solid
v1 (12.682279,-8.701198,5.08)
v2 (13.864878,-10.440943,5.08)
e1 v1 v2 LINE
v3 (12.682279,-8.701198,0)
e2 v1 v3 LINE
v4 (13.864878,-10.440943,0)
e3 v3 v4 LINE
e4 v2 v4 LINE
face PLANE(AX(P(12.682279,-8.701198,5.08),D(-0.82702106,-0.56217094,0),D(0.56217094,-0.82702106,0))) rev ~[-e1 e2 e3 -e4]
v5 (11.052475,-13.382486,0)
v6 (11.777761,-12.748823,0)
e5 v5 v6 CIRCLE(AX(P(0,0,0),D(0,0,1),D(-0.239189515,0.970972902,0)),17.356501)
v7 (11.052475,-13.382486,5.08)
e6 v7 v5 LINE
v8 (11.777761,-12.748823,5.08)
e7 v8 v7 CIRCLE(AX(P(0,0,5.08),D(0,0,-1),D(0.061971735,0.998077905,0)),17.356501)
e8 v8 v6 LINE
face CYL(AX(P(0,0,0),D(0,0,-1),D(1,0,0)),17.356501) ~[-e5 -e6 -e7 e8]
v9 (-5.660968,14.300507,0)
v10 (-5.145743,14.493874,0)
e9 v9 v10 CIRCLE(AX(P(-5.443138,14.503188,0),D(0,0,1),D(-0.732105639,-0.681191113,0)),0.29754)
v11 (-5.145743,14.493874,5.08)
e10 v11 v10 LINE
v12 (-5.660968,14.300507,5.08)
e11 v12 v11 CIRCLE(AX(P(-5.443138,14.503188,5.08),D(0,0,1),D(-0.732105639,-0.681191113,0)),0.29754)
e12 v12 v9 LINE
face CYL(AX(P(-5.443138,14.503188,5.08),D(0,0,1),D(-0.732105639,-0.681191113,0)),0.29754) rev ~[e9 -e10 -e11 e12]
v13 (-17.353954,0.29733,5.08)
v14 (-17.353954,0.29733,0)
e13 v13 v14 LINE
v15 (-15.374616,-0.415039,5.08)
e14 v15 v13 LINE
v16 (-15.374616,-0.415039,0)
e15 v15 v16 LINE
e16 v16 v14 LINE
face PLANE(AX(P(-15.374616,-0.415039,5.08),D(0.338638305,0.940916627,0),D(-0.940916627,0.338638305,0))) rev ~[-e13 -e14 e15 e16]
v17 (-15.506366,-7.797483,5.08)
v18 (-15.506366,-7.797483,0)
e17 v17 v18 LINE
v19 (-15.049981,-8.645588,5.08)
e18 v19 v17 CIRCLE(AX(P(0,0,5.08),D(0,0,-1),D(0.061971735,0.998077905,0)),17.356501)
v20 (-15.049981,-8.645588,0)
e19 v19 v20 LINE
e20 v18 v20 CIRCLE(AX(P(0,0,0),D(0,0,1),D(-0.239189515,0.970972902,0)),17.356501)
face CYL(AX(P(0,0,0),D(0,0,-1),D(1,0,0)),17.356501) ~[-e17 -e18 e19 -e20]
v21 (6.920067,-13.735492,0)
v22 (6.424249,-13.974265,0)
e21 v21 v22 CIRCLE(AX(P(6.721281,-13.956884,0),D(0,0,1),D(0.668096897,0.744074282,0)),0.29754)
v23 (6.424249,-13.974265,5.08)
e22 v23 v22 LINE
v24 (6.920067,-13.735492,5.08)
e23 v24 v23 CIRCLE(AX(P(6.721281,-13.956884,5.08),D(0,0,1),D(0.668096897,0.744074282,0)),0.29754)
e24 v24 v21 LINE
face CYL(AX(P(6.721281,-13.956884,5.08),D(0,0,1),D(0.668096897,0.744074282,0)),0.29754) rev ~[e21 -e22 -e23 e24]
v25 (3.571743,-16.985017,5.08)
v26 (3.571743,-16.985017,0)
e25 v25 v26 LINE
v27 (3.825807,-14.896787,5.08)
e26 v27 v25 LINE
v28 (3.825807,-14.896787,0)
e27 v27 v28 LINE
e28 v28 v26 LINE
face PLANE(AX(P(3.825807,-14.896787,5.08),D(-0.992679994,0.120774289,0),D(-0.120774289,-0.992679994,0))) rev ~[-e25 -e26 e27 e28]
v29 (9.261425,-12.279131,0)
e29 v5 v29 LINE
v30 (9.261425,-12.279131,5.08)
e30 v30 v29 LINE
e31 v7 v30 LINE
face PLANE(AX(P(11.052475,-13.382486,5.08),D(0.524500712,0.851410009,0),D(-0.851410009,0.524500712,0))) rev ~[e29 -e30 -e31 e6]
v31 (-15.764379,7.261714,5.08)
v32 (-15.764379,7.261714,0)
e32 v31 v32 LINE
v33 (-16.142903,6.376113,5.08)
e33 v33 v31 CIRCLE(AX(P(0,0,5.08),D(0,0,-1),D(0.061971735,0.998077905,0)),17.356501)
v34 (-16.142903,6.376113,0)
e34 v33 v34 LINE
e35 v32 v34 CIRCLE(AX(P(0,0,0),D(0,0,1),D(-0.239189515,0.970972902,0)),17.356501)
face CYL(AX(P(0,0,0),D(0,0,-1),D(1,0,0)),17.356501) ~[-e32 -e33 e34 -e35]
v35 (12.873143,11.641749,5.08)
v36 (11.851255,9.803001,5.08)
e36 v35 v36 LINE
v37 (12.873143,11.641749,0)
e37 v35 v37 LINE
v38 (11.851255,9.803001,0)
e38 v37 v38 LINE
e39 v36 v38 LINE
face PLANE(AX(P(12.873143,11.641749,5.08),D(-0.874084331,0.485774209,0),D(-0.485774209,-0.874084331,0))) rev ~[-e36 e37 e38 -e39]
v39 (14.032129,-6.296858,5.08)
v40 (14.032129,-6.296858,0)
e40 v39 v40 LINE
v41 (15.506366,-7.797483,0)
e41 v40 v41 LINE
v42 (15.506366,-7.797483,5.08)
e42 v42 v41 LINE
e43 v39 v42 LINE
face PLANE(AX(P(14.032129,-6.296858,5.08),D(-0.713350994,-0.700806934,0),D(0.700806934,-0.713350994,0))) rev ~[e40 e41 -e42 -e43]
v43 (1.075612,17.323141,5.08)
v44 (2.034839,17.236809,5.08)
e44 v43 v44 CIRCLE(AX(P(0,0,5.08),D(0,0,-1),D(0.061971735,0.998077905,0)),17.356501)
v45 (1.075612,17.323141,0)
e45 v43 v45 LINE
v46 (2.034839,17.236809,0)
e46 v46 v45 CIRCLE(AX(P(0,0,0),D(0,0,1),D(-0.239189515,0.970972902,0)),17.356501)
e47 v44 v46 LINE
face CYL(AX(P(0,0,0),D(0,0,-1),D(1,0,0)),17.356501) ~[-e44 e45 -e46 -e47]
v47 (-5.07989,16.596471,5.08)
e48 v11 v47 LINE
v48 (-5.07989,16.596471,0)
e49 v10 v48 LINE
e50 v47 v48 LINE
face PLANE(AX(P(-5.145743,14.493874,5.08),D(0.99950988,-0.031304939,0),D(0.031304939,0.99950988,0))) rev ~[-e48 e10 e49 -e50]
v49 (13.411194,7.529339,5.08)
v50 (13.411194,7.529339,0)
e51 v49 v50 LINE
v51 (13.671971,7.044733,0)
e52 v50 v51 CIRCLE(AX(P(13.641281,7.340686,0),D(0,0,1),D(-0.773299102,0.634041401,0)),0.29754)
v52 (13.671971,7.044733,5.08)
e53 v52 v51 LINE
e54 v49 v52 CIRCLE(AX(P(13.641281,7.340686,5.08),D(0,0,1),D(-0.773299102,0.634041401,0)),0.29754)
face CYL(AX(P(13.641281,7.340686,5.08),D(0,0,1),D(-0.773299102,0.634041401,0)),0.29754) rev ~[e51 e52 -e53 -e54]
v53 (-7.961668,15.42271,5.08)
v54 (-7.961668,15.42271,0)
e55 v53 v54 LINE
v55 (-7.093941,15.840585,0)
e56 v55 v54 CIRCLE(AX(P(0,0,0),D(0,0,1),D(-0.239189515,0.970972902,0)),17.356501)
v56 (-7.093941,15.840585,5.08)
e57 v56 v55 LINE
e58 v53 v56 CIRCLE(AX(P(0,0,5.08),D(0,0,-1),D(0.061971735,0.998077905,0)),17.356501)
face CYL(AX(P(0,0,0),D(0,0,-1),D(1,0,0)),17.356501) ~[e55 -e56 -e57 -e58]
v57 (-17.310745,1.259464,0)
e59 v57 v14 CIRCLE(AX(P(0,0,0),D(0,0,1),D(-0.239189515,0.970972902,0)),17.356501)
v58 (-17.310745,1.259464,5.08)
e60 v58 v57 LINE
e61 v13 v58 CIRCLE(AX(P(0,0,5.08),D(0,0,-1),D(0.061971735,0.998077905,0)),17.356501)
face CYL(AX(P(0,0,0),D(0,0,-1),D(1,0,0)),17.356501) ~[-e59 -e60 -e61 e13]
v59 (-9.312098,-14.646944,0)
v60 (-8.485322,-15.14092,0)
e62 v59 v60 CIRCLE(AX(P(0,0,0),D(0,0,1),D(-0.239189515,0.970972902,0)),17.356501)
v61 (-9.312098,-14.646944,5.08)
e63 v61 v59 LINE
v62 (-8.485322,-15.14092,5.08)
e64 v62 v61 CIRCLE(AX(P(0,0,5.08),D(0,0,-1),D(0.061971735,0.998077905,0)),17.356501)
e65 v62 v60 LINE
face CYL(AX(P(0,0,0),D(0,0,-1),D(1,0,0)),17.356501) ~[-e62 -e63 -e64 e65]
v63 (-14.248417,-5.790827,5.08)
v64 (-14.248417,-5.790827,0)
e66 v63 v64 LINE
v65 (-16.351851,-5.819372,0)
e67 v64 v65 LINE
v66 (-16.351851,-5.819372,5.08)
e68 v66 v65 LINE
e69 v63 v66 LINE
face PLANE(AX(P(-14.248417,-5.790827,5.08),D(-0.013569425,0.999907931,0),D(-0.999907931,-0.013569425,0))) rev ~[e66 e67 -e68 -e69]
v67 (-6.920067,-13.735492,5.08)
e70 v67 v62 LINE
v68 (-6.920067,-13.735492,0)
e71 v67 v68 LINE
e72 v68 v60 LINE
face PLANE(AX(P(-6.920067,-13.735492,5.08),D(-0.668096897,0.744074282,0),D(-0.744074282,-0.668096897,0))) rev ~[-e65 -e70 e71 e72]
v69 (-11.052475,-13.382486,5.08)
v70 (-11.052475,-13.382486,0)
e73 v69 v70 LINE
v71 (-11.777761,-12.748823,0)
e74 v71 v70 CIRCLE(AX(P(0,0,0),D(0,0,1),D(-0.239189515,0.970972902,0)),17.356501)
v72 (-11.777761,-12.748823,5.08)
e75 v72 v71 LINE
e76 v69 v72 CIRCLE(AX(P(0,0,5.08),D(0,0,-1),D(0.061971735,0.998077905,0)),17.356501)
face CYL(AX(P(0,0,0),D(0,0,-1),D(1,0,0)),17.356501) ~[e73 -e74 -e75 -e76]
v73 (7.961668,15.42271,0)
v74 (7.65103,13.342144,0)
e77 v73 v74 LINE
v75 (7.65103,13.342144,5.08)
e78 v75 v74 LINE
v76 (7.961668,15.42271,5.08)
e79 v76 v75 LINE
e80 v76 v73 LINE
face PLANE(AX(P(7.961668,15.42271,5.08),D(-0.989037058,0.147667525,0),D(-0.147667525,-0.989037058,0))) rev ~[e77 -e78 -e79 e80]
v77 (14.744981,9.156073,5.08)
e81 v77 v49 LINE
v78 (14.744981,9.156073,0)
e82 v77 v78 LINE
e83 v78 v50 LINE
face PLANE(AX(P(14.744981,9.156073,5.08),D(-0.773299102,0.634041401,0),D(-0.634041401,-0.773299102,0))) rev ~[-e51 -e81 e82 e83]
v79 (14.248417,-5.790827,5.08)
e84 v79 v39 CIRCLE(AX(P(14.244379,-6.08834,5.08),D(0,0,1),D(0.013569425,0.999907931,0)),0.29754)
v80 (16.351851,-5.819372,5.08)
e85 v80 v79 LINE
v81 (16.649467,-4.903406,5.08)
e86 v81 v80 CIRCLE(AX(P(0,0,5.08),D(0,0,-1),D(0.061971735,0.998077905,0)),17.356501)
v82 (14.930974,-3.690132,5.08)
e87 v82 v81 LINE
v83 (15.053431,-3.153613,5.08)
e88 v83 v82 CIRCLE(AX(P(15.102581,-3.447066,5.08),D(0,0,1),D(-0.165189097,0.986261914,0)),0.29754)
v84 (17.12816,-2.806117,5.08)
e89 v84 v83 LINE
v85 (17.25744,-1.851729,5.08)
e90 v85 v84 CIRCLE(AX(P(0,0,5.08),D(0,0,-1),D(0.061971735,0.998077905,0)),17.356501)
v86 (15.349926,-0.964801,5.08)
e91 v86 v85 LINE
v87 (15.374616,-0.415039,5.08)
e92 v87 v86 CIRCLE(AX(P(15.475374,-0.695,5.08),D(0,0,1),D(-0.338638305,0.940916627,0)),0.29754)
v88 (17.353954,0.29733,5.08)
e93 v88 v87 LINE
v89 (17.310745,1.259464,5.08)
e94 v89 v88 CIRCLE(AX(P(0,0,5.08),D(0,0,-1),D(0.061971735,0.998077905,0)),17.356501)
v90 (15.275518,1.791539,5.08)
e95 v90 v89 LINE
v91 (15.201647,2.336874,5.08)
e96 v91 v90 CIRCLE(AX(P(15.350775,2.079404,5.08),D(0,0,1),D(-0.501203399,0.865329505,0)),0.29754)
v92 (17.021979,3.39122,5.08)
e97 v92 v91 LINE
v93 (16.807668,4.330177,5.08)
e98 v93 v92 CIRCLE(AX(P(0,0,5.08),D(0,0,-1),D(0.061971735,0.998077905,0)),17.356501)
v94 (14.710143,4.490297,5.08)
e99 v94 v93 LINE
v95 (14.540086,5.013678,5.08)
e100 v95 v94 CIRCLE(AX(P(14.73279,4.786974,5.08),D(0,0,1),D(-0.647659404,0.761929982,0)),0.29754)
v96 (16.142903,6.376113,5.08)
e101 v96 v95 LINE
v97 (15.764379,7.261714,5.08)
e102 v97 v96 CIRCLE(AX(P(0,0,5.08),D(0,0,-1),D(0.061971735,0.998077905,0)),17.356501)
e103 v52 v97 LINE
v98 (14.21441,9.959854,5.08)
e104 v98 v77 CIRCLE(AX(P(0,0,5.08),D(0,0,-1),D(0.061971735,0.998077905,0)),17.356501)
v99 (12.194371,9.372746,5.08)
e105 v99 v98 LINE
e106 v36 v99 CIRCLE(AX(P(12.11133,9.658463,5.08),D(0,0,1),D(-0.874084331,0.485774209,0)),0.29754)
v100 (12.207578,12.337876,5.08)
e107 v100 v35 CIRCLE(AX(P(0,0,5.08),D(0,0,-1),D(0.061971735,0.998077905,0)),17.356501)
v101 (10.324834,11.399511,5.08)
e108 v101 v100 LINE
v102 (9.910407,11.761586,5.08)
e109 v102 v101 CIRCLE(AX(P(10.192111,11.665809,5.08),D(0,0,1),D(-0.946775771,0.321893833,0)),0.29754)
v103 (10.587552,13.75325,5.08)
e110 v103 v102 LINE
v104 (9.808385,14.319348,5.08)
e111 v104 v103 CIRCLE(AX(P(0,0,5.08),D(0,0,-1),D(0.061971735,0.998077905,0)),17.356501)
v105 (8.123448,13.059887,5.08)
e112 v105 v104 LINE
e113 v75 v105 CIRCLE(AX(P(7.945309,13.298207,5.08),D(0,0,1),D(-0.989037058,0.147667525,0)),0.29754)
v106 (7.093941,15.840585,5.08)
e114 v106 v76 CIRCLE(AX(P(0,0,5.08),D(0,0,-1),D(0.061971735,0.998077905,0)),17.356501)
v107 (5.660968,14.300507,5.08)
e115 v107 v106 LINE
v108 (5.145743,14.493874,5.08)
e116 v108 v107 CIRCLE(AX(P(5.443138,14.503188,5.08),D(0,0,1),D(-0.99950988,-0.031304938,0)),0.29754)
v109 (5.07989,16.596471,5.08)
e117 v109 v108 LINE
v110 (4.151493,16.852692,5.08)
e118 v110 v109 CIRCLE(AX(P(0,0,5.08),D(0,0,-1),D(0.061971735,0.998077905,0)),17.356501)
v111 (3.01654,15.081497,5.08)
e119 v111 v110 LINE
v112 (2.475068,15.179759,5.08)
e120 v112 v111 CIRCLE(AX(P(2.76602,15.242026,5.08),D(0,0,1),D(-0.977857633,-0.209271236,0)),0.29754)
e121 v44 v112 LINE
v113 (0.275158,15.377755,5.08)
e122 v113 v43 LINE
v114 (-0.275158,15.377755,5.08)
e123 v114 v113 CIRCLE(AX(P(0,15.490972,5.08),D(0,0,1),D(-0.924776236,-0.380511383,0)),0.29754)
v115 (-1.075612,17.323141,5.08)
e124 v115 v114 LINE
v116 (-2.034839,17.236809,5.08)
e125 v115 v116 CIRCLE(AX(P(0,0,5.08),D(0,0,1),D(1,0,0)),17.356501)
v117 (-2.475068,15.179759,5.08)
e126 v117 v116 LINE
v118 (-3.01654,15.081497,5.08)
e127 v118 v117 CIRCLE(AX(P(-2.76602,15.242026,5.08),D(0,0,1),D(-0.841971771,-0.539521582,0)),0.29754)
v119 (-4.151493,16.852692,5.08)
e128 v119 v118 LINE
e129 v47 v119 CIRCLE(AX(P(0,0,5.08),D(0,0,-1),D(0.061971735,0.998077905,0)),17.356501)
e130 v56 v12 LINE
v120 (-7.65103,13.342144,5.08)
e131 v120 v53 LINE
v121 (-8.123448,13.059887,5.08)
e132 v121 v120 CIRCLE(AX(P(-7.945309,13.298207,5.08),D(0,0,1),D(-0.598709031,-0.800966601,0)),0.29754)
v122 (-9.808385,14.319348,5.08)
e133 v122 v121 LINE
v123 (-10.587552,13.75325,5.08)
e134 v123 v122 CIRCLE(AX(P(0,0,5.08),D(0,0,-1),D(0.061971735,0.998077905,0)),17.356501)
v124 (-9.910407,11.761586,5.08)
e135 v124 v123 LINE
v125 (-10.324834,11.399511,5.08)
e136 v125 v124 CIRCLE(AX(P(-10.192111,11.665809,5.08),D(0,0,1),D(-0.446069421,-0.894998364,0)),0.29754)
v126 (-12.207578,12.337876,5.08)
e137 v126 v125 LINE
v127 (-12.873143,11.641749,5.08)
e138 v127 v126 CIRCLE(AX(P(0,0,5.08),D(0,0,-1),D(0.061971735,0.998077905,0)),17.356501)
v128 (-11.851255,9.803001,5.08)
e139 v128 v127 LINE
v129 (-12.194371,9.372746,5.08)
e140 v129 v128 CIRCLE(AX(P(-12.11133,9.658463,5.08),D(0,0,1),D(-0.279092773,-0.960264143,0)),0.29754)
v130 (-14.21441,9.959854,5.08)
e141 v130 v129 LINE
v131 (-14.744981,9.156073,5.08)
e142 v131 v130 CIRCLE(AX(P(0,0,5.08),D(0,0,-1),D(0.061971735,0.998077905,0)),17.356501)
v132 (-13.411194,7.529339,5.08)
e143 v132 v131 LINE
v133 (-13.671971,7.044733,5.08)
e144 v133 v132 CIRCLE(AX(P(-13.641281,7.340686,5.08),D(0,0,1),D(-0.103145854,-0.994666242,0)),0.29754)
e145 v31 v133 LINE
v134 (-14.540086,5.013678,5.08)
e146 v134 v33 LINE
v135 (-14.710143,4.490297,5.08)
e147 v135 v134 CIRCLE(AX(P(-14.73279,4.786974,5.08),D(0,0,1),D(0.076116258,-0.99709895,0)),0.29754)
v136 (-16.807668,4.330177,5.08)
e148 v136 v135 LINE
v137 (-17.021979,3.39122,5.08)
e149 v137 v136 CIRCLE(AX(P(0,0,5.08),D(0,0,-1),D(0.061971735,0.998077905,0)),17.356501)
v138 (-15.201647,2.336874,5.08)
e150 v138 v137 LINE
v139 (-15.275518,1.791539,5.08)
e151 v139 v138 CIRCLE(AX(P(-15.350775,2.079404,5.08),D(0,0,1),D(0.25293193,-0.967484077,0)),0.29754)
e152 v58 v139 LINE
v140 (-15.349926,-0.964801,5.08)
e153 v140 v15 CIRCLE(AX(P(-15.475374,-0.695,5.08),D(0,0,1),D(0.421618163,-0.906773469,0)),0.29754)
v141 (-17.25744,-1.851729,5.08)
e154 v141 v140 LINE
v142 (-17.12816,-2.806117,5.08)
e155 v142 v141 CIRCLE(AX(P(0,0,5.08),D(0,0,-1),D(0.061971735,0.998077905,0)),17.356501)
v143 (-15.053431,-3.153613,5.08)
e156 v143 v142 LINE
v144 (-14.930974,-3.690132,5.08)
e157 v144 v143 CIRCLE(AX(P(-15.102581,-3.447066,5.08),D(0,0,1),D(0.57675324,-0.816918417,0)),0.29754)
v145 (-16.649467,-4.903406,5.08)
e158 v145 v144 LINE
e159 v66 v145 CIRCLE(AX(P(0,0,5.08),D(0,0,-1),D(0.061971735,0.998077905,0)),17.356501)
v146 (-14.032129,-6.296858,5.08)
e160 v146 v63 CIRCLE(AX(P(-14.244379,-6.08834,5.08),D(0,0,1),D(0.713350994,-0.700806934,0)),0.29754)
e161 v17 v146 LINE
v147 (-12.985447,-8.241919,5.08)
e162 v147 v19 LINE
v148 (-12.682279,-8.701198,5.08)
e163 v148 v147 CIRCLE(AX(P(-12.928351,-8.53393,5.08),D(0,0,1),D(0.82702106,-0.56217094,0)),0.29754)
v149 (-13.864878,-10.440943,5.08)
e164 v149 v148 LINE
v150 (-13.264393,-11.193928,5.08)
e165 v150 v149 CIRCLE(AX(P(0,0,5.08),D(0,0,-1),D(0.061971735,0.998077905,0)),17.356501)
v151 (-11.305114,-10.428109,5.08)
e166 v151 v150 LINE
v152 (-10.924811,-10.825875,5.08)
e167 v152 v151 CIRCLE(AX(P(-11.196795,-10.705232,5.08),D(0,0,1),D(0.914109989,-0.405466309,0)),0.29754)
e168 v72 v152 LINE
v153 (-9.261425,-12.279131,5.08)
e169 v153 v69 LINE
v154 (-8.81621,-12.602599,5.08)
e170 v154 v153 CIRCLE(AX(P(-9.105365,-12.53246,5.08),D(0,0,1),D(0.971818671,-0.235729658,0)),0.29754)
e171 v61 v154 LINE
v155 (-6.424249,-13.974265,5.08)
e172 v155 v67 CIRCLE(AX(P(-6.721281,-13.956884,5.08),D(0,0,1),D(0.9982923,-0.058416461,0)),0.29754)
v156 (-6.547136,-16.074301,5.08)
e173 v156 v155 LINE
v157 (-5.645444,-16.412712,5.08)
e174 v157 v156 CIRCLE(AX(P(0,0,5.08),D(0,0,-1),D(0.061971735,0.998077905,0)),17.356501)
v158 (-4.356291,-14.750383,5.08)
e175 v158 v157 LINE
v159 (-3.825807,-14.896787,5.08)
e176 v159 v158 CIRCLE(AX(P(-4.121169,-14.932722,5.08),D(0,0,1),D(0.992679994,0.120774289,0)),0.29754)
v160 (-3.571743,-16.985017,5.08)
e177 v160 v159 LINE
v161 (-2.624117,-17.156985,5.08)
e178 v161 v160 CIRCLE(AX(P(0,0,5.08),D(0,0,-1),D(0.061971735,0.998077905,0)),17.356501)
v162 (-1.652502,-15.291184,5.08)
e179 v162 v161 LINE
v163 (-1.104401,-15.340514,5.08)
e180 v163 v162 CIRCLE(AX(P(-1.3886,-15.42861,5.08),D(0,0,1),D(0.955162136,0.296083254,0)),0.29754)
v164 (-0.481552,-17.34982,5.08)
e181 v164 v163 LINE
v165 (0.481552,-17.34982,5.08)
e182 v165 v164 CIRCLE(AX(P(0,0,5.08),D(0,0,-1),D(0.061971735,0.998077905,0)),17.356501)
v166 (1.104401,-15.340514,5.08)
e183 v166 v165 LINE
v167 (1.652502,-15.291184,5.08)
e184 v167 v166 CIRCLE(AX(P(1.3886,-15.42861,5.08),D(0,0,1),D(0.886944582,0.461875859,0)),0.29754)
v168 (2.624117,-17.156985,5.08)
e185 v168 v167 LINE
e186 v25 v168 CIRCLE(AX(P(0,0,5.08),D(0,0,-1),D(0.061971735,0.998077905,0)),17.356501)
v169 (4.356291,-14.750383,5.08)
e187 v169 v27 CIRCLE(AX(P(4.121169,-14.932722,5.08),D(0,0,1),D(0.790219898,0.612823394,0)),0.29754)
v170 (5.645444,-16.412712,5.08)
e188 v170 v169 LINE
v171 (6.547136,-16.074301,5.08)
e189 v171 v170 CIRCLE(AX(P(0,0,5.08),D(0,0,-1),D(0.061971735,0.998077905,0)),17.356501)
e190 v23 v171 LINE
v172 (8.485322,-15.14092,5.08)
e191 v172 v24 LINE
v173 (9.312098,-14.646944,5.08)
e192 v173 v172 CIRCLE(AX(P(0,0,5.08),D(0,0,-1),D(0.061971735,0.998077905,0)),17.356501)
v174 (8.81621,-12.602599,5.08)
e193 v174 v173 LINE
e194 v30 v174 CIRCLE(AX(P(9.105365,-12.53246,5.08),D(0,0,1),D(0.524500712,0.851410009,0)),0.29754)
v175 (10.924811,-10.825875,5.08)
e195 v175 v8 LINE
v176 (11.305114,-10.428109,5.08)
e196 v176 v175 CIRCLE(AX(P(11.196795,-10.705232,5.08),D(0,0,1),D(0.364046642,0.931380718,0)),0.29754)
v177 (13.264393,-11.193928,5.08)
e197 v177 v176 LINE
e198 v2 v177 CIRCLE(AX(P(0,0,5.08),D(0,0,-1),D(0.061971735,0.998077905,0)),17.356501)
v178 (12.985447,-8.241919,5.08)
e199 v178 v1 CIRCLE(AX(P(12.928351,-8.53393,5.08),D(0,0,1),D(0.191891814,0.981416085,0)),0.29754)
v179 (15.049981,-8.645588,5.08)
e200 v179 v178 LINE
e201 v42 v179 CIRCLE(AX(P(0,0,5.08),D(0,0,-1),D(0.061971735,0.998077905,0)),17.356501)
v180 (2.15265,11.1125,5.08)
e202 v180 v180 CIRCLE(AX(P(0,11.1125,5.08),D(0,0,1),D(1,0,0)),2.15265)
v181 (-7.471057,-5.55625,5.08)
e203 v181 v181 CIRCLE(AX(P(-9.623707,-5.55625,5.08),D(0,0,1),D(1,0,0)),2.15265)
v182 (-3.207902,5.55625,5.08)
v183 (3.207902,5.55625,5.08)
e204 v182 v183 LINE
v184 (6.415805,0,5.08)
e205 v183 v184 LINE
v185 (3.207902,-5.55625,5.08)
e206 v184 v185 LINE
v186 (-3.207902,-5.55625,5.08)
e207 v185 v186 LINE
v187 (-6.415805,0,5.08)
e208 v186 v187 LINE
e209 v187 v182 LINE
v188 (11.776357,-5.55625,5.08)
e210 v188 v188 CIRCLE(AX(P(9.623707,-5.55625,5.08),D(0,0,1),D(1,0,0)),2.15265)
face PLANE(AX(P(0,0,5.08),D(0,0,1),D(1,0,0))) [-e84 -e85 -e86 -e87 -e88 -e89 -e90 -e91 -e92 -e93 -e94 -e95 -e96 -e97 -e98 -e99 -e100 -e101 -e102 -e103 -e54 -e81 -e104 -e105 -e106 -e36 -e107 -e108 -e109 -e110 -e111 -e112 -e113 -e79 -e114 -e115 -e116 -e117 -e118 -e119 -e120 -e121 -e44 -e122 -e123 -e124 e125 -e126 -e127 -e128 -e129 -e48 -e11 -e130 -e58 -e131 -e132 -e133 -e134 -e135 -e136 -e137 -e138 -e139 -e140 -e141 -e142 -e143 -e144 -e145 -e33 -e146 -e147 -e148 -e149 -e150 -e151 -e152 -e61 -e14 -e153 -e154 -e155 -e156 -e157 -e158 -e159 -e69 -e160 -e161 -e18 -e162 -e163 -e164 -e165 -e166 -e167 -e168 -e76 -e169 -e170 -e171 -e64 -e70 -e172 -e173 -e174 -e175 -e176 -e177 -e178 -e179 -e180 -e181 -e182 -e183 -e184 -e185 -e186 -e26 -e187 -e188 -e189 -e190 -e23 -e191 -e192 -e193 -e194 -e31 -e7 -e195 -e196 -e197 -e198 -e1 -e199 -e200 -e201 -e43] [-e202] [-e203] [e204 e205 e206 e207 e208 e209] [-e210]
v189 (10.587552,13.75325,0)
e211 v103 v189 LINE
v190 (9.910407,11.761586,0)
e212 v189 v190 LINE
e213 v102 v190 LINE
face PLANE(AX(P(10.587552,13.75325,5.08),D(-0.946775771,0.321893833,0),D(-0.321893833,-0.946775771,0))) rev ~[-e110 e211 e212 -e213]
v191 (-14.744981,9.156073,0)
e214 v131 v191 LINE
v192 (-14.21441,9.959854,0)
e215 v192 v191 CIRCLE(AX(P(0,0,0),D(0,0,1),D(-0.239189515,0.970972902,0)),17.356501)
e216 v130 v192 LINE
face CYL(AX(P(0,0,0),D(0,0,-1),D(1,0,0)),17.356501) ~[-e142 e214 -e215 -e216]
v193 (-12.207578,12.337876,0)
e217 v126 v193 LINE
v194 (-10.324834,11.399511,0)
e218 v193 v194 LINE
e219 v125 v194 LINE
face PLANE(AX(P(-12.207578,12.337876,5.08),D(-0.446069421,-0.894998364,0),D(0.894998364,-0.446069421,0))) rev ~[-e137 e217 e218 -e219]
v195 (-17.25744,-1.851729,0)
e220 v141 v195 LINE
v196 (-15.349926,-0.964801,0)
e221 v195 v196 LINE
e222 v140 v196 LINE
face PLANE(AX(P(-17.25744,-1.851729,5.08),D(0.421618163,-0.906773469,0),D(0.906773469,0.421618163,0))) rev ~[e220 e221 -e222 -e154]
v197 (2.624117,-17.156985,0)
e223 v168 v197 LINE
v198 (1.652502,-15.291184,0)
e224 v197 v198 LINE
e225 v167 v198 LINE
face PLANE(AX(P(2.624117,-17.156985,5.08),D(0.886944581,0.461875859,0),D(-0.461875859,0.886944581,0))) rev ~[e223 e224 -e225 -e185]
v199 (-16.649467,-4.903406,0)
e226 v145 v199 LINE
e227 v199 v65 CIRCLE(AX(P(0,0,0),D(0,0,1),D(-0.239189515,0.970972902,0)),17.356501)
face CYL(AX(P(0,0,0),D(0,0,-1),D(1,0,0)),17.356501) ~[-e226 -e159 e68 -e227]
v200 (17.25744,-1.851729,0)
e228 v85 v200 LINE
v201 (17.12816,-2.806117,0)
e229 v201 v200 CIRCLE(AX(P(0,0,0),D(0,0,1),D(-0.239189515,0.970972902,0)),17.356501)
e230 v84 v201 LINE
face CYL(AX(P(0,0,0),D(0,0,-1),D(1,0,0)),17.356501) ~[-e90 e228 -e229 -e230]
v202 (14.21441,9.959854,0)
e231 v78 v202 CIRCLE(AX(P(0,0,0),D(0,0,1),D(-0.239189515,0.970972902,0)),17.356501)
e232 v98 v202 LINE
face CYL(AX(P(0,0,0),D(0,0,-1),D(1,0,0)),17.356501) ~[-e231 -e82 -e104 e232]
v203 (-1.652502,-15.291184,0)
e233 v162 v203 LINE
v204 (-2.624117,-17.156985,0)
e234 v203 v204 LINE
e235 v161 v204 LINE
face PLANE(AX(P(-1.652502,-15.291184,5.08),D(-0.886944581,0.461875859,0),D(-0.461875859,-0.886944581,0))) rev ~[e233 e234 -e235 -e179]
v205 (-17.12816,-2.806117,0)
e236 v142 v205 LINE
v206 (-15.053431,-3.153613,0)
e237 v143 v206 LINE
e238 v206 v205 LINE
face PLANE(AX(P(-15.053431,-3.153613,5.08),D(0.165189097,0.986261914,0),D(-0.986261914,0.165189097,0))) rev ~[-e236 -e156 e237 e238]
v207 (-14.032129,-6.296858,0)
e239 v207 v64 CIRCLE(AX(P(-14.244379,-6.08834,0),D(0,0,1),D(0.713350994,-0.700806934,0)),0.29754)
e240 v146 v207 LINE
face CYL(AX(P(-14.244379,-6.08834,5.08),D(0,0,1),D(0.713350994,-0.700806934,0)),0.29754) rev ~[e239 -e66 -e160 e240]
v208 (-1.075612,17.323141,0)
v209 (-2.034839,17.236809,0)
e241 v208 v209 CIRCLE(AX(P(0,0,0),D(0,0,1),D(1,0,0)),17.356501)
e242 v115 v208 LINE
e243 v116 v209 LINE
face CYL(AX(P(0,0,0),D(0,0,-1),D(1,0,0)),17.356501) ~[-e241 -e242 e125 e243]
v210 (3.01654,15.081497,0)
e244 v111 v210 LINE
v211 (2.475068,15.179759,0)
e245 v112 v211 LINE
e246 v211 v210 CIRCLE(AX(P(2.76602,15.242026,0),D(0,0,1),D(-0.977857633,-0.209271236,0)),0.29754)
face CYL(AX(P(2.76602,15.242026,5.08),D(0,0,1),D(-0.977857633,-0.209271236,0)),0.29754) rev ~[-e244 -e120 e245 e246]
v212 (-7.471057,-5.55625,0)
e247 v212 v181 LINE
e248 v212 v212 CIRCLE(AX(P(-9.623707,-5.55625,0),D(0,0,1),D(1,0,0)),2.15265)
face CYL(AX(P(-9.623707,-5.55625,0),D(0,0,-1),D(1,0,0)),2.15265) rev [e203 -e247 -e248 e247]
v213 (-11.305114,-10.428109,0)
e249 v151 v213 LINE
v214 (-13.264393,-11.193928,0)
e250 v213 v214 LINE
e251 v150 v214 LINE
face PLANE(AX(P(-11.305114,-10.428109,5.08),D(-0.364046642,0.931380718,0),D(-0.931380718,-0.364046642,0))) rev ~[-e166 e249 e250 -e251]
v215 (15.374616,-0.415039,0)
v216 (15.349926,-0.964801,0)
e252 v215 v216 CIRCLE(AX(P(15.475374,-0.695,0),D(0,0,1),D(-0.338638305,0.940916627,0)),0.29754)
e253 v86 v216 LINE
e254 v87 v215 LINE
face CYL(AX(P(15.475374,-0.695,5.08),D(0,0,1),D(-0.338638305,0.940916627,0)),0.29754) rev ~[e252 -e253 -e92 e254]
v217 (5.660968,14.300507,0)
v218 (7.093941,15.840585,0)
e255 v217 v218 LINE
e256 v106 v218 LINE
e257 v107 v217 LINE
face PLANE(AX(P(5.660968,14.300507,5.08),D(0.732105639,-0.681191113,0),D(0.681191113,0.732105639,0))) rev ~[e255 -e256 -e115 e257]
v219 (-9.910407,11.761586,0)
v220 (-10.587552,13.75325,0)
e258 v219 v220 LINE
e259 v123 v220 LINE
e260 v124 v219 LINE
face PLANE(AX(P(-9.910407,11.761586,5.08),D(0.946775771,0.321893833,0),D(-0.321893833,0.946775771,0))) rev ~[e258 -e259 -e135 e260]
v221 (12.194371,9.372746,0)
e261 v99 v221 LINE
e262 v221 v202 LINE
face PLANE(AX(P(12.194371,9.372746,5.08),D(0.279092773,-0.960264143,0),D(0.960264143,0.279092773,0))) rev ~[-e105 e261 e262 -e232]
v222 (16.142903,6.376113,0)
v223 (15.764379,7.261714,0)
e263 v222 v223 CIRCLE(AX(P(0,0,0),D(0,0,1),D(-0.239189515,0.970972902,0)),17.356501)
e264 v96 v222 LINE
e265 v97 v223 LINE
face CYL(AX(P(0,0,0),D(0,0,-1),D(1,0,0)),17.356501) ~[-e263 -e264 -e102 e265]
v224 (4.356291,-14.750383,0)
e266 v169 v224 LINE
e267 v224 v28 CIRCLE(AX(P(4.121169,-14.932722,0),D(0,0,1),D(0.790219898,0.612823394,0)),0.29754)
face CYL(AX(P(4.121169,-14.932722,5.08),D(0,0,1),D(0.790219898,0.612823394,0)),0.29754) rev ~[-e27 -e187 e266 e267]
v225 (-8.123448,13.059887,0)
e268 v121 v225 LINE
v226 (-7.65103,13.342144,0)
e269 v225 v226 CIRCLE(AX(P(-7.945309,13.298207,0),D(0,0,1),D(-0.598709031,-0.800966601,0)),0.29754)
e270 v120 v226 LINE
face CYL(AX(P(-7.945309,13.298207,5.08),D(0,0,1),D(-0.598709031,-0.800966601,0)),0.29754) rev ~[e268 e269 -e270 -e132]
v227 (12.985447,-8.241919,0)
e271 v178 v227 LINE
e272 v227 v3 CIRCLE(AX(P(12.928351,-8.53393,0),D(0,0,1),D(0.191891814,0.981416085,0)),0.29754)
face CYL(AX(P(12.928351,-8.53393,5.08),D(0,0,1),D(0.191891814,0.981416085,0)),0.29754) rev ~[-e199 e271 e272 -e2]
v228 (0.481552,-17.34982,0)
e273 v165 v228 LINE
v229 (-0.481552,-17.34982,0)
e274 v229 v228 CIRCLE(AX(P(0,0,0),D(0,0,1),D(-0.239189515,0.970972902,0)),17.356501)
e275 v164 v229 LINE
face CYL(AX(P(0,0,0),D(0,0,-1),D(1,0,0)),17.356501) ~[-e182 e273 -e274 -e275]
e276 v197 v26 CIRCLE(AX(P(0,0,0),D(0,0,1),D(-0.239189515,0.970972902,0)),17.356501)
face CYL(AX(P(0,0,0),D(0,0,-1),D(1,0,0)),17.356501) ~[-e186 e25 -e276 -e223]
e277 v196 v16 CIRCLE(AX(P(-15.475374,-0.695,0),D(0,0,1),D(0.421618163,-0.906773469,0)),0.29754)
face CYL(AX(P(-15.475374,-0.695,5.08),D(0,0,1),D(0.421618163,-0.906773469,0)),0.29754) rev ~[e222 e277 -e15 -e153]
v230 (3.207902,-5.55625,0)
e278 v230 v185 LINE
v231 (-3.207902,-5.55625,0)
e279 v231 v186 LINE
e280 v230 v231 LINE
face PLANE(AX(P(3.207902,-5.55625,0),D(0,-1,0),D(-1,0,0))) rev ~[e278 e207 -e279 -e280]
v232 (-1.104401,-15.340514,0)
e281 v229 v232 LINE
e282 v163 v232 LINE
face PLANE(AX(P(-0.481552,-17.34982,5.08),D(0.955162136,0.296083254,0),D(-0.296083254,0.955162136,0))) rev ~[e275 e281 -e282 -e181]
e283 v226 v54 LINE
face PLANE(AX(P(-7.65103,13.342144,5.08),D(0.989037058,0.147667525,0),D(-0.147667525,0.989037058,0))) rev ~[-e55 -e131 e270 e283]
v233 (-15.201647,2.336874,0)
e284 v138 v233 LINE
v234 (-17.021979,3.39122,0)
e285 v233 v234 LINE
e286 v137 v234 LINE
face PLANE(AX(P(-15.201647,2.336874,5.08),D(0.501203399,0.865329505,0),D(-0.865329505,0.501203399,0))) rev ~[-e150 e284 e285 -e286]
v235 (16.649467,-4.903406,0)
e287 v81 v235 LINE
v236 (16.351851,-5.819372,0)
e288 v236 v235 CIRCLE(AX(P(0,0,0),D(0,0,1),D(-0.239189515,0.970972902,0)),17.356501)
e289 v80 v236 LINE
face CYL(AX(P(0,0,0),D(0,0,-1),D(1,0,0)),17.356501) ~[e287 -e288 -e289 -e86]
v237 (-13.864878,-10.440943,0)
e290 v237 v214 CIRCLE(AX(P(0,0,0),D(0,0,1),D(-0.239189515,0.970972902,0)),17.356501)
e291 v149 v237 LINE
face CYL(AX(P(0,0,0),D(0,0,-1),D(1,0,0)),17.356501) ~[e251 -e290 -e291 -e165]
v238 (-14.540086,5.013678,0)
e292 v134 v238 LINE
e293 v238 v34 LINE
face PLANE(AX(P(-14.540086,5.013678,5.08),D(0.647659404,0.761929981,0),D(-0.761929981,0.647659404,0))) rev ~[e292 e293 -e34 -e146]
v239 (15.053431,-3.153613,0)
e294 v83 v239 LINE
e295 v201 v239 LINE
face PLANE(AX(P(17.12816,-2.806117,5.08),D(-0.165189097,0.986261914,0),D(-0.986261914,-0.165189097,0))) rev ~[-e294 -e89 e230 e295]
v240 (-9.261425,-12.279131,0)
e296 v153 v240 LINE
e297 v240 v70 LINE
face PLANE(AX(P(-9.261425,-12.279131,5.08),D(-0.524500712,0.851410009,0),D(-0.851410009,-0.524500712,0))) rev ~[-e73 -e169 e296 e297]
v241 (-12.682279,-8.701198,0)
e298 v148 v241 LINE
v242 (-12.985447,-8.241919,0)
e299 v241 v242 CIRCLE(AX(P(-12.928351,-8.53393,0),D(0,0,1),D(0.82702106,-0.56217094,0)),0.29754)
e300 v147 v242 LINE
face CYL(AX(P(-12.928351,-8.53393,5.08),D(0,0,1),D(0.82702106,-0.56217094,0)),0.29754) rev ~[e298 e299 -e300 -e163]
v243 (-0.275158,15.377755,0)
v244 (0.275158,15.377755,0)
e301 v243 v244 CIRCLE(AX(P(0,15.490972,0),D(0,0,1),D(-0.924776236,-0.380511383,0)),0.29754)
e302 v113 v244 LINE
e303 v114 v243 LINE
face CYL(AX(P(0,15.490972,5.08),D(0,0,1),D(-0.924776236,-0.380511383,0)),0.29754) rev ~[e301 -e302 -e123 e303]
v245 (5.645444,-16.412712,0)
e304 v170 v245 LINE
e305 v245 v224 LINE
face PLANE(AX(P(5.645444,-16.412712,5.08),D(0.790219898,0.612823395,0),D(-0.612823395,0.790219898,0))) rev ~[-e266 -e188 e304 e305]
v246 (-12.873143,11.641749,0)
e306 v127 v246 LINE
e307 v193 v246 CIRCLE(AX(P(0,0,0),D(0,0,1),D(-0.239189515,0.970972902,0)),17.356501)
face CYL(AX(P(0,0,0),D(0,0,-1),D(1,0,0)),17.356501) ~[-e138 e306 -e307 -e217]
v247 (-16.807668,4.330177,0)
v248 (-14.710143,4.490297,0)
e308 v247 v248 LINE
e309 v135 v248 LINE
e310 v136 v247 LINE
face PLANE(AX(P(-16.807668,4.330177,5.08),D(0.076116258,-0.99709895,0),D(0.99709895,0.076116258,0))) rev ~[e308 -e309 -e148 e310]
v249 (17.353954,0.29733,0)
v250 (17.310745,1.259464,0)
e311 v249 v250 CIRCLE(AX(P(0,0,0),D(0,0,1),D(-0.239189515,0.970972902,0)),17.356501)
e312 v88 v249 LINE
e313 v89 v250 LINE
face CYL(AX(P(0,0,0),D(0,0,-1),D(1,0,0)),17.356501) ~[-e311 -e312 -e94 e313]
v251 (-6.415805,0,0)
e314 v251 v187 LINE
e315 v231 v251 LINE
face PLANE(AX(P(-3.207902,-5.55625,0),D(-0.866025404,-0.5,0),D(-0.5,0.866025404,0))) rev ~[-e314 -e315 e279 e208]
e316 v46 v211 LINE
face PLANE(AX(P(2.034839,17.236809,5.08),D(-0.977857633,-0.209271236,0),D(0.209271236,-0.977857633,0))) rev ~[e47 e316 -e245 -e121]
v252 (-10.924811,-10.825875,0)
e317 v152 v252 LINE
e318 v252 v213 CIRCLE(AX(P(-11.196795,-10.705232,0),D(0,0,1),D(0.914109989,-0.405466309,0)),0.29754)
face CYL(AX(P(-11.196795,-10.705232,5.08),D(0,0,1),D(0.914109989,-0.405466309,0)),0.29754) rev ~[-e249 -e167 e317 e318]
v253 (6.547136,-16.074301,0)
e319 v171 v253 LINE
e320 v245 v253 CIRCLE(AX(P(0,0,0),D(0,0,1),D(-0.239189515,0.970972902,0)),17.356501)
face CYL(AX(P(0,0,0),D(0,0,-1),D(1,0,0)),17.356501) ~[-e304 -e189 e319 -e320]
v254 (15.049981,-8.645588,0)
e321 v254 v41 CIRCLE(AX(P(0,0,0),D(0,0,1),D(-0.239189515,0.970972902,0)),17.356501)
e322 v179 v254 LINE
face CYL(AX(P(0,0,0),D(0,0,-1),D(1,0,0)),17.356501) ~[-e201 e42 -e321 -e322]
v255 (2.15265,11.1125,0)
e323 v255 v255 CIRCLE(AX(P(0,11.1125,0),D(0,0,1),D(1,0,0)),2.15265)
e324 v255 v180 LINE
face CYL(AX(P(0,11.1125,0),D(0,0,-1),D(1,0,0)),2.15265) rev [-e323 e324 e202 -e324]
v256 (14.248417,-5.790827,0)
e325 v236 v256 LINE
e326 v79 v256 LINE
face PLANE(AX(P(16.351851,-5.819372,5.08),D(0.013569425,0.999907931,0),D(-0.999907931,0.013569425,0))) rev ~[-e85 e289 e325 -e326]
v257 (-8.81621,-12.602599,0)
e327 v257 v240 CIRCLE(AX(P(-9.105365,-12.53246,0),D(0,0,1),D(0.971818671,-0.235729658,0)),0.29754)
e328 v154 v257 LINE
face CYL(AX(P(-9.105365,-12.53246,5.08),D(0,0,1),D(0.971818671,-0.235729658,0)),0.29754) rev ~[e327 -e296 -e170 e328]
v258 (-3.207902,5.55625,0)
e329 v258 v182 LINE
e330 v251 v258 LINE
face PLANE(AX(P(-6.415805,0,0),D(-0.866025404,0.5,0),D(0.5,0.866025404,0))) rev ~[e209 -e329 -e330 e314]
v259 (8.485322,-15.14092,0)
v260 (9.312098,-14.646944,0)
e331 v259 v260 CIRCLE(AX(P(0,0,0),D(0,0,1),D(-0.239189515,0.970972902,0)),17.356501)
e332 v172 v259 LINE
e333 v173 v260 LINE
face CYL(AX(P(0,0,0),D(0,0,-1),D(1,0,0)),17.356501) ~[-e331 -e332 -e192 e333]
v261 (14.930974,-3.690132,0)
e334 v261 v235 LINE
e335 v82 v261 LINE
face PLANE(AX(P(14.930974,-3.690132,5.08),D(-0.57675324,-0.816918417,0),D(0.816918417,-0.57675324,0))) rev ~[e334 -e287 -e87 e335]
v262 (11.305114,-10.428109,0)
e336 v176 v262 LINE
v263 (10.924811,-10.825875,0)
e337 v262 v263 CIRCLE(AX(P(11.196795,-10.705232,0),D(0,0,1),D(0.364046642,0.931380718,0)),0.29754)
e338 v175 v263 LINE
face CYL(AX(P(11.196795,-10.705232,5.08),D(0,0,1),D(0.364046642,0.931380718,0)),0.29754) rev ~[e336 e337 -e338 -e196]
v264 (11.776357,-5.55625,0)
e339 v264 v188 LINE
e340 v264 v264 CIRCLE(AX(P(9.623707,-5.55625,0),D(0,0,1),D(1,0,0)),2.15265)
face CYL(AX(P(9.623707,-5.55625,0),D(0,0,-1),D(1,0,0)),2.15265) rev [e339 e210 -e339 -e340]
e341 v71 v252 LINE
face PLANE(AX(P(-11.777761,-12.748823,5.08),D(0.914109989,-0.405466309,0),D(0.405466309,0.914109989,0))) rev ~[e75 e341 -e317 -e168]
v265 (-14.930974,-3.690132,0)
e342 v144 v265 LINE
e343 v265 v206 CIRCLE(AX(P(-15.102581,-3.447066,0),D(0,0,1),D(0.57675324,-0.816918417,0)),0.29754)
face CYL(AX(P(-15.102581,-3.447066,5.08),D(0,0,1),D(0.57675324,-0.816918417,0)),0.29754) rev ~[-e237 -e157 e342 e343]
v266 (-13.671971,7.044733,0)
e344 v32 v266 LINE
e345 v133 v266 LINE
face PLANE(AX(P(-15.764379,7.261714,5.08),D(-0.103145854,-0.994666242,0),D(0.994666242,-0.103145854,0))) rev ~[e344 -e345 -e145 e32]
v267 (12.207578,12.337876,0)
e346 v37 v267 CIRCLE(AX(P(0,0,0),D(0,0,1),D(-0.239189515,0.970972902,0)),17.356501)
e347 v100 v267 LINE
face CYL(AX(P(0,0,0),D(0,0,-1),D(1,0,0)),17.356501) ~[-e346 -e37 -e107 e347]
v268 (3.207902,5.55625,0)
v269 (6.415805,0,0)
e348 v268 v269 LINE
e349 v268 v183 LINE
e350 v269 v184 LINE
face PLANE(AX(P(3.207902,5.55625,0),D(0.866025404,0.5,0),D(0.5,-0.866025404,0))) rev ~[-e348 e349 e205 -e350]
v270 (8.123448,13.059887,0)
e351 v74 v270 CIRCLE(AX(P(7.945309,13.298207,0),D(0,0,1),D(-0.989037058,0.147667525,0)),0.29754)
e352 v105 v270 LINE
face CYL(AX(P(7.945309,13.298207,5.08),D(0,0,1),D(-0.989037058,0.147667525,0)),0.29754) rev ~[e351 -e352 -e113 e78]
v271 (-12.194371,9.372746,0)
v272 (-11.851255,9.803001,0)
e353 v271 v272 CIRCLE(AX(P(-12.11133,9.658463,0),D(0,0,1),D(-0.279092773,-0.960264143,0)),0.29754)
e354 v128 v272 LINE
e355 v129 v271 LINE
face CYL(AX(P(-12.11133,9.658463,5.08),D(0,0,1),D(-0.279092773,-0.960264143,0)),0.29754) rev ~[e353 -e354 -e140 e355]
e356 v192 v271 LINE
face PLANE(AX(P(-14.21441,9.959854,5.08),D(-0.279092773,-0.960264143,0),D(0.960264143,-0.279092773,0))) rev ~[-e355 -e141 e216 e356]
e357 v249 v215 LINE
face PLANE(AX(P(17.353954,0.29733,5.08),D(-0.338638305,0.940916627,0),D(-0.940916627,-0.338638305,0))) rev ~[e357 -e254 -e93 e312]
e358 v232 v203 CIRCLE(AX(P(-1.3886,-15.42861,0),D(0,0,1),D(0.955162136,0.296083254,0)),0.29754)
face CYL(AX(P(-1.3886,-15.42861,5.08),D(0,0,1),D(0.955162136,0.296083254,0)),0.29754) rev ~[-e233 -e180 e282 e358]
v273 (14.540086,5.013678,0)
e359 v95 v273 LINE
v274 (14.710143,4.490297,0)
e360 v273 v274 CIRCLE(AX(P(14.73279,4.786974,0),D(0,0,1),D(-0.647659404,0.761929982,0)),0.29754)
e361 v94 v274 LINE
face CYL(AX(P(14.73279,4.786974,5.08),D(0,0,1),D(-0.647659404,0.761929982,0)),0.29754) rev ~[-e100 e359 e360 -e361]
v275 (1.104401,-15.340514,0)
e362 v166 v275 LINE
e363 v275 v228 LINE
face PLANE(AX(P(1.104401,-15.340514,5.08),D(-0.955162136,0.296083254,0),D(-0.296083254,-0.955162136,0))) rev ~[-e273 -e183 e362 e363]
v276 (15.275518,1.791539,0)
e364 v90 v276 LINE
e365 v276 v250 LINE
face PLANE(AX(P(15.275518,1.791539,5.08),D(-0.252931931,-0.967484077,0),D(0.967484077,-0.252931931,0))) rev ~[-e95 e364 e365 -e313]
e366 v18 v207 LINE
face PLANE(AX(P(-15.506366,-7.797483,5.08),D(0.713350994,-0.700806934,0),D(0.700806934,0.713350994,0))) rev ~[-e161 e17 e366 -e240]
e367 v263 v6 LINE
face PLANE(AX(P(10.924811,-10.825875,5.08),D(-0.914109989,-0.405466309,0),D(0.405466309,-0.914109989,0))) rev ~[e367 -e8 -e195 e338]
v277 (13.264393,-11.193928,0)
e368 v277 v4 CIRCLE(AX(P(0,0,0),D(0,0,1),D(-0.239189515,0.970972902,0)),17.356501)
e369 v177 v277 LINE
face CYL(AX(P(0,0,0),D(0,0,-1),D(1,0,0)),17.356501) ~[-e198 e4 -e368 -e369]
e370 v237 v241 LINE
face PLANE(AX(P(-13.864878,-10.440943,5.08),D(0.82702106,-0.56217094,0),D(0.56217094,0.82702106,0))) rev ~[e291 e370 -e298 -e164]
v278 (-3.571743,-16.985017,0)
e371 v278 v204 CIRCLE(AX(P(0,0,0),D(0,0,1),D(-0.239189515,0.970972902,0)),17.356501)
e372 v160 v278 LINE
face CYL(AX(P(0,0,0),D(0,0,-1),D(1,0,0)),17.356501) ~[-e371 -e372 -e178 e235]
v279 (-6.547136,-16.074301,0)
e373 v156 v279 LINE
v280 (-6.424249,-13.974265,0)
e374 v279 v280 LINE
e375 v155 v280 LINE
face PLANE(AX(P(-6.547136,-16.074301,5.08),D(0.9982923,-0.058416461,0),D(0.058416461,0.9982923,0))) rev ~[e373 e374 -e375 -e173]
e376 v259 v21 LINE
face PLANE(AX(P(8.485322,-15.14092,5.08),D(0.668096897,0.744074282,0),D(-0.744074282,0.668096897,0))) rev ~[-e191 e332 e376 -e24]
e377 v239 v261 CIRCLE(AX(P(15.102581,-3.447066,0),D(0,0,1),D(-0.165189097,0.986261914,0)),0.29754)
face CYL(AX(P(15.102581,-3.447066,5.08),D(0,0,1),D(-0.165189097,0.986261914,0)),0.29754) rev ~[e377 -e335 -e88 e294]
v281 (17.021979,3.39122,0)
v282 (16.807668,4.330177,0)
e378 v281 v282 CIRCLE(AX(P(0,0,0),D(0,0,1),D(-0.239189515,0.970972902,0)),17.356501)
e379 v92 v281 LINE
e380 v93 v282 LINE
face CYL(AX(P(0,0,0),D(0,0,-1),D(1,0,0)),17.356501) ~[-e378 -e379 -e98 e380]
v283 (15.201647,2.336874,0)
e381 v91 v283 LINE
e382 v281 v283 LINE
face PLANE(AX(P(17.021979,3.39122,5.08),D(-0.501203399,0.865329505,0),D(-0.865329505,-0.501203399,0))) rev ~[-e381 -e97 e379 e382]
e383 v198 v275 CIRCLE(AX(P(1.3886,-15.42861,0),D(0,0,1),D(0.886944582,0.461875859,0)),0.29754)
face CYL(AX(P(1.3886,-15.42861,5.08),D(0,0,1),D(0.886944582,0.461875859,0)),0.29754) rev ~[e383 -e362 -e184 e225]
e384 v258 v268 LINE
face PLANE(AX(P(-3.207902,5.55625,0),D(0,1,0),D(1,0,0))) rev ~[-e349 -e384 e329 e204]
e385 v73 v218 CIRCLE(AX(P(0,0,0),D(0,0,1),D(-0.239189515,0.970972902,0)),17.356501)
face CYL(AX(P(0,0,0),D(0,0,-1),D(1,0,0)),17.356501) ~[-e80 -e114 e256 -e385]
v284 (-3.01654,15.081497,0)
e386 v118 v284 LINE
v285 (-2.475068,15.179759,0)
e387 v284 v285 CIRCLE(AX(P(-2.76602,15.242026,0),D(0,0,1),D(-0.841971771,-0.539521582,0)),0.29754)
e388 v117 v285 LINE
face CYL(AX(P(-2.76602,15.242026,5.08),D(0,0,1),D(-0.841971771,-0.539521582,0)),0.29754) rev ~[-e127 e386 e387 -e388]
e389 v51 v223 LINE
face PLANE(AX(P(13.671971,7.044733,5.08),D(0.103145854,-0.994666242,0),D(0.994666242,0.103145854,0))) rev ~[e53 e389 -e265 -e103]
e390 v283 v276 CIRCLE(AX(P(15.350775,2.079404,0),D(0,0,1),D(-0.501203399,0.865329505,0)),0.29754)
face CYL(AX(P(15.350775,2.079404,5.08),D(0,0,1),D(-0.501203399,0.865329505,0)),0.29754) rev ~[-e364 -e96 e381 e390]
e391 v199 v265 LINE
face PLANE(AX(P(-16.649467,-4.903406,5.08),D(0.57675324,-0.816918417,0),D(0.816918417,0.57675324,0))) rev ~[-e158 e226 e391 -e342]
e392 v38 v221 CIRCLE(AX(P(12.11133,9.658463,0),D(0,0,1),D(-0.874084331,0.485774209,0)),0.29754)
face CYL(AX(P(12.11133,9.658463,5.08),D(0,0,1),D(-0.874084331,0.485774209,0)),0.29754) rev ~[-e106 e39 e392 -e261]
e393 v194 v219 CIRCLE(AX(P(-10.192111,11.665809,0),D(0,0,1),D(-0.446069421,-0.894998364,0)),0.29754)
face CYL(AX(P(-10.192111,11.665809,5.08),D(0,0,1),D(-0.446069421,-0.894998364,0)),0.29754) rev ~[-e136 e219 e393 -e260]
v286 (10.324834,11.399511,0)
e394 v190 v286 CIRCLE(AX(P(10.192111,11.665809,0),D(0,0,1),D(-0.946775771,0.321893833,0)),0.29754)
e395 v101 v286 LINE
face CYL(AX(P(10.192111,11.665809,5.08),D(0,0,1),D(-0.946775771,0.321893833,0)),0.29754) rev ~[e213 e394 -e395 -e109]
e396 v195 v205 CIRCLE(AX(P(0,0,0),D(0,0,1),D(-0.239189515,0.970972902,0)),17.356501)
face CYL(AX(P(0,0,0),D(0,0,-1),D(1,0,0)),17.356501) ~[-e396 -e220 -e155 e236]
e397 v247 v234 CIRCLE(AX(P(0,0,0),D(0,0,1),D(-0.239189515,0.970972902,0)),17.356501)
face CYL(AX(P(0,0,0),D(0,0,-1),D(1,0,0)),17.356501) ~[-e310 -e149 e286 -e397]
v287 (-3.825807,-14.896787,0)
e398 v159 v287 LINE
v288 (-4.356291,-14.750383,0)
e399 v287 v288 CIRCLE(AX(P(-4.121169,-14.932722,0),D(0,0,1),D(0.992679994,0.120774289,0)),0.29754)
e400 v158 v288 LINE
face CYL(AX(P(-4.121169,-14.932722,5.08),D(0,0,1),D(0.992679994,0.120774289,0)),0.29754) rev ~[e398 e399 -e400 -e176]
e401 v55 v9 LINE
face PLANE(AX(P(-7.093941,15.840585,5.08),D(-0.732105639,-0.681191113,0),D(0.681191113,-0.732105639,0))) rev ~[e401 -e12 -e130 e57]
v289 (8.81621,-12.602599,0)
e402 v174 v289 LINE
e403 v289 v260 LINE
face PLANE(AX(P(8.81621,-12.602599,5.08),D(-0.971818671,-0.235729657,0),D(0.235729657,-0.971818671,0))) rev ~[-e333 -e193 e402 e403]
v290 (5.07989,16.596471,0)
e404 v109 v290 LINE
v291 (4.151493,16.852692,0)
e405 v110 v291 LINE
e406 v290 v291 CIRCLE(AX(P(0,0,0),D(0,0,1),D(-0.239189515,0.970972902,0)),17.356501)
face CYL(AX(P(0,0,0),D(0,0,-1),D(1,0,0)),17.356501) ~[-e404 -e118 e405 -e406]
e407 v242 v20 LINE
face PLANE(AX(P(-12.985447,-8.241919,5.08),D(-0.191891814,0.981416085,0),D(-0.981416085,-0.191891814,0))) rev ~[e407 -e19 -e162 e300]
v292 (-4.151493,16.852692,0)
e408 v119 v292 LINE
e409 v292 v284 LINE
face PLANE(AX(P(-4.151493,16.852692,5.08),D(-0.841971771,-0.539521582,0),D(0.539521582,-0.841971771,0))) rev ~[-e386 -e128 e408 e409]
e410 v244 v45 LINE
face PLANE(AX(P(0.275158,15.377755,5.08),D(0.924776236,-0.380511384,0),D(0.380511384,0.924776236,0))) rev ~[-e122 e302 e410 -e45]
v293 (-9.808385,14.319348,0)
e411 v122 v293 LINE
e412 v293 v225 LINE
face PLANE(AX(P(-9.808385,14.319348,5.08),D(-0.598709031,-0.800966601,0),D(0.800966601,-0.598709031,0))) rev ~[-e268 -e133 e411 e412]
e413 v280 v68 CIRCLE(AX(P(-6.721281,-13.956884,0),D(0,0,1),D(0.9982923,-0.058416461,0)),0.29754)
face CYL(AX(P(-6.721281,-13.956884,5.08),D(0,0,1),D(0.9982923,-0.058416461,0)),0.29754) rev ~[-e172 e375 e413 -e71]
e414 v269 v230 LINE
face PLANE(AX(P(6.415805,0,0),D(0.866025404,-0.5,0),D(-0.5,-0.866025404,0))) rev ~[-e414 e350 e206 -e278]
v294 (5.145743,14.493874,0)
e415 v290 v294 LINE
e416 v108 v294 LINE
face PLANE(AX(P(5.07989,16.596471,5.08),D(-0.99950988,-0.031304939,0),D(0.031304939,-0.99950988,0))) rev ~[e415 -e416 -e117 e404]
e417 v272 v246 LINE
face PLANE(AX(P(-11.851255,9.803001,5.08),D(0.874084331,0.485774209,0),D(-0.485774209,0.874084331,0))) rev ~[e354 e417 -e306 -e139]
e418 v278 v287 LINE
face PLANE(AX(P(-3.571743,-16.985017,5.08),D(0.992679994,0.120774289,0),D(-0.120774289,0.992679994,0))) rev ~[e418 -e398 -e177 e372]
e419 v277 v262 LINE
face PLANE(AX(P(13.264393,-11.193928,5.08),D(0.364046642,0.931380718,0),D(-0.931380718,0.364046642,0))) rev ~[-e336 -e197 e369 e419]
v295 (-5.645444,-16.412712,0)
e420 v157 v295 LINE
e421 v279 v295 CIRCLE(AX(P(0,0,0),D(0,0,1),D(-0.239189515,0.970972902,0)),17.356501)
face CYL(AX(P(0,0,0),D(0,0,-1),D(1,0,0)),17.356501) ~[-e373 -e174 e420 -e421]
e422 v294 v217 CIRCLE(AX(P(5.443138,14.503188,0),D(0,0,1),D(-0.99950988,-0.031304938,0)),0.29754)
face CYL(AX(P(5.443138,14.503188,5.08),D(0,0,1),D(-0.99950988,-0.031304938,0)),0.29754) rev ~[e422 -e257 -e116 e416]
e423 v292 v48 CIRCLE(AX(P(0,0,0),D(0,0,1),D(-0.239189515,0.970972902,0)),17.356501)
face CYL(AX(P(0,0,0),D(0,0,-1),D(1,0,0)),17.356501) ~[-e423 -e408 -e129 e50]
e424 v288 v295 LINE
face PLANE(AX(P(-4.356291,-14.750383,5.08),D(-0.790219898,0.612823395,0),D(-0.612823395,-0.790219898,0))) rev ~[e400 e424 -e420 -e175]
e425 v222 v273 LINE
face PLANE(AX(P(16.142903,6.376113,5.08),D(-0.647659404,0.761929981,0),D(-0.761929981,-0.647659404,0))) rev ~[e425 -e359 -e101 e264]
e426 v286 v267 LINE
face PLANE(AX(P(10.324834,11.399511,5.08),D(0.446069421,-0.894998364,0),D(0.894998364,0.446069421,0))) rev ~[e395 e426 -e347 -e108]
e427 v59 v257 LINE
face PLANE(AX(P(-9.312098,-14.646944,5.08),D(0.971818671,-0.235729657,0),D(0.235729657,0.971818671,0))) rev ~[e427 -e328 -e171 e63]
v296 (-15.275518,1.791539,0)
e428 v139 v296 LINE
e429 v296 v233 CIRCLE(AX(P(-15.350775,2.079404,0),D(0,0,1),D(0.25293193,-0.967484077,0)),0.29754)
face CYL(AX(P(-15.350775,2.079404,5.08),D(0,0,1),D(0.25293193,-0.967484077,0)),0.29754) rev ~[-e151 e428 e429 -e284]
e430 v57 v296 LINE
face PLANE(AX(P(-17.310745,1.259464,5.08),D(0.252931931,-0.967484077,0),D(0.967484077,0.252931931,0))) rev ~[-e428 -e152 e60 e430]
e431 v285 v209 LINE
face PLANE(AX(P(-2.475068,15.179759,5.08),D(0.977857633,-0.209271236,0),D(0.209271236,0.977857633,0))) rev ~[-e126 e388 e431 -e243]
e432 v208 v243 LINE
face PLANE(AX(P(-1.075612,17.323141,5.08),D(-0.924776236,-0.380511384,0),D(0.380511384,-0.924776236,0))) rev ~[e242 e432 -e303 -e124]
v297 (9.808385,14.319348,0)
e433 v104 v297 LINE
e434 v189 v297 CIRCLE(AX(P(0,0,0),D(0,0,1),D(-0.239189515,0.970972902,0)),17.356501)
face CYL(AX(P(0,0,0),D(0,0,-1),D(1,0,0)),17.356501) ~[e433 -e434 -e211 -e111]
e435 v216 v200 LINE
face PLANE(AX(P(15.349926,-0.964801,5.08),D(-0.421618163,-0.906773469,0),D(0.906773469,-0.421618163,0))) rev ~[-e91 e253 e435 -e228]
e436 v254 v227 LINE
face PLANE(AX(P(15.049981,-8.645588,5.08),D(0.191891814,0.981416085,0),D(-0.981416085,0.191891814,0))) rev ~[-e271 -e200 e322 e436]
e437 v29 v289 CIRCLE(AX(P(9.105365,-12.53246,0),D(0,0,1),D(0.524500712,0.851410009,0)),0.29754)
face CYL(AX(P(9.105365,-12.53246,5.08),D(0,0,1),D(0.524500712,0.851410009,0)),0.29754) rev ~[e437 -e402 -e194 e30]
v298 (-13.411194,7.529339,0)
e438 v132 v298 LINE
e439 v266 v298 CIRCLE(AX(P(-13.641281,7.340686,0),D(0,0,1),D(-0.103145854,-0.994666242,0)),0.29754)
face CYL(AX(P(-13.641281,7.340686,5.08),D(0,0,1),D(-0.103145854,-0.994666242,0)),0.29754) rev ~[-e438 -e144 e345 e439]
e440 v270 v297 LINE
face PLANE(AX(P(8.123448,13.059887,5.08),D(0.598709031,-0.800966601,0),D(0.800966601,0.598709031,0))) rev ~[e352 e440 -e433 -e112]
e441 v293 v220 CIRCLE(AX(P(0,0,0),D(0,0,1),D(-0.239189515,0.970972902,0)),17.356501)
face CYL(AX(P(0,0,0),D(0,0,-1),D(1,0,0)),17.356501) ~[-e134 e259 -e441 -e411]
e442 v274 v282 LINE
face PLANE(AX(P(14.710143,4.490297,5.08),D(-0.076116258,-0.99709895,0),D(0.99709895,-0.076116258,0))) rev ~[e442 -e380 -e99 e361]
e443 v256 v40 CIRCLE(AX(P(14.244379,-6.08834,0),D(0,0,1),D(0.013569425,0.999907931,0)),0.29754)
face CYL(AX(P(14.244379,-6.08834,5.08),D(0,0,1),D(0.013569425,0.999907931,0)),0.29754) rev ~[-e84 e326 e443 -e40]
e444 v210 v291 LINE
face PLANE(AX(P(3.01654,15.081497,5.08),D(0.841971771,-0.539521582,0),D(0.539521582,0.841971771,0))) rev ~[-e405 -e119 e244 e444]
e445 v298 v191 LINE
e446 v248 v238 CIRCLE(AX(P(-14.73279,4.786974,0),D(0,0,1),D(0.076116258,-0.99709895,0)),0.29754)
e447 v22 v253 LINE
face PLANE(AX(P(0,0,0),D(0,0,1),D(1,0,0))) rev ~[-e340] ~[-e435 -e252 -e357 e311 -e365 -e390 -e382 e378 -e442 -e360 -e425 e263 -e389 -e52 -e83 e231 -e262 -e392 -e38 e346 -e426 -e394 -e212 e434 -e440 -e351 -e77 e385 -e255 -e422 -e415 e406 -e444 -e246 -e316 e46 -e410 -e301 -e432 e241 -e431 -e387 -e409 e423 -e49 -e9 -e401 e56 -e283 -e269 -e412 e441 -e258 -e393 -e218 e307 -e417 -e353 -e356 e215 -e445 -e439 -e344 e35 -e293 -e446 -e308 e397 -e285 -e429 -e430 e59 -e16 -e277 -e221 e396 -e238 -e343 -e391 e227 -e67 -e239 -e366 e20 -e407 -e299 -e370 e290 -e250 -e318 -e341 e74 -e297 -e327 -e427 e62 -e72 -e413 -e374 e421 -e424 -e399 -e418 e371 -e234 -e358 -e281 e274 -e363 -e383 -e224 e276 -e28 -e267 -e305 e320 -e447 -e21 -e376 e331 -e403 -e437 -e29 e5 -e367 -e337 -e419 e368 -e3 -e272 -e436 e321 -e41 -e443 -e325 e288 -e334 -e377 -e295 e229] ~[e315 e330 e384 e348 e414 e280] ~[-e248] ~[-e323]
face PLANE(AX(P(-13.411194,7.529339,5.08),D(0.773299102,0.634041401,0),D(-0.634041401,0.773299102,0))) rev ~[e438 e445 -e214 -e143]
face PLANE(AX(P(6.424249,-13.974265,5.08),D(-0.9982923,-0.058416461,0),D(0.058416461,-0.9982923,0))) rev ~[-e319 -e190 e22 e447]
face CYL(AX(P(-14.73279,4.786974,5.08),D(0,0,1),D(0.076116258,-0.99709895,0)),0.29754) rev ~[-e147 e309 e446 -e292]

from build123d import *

# Parameters (mm, degrees)
F0_R            = 17.3565013667
F0_R_2          = 2.15265
F1_DEPTH        = 5.08
F3_DEPTH        = 5.08
F3_COPIES_COUNT = 35


# Not quite as in the source:
# - a pattern or mirror of a feature is missing from the dataset's text; its kind, count and spacing are read off the source's solid
# - a feature names something its author has since deleted; it is built from what else it names


with BuildPart() as f1:
    # F0 (on Top) → F1 (new body)
    with BuildSketch(Plane.XY):
        Circle(F0_R)
        with Locations((-9.6237072996, -5.55625)):
            Circle(F0_R_2, mode=Mode.SUBTRACT)
        with Locations((9.6237072996, -5.55625)):
            Circle(F0_R_2, mode=Mode.SUBTRACT)
        Polygon((6.4158048664, 0), (3.2079024332, -5.55625), (-3.2079024332, -5.55625), (-6.4158048664, 0), (-3.2079024332, 5.55625), (3.2079024332, 5.55625), align=None, mode=Mode.SUBTRACT)
        with Locations((0, 11.1125)):
            Circle(F0_R_2, mode=Mode.SUBTRACT)
    extrude(amount=F1_DEPTH)

    # F2 (on face) → F3 (cut, through all)
    with BuildSketch(Plane.XY.offset(5.08)):
        with BuildLine():
            Line((0.275157943, 15.3777549622), (1.0756124971, 17.3231405192))
            ThreePointArc((1.0756124971, 17.3231405192), (0, 17.3565013667), (-1.0756124971, 17.3231405192))
            Line((-1.0756124971, 17.3231405192), (-0.275157943, 15.3777549622))
            ThreePointArc((-0.275157943, 15.3777549622), (0, 15.1934323047), (0.275157943, 15.3777549622))
        make_face()
    f3 = extrude(amount=-F3_DEPTH, mode=Mode.SUBTRACT)

    # F3_copies: F3 ×35 about axis
    f3_copies_axis = Axis((0, 0, 0), (0, 0, 1))
    for i in range(1, F3_COPIES_COUNT):
        add(f3.rotate(f3_copies_axis, i * 360 / F3_COPIES_COUNT), mode=Mode.SUBTRACT)


solid = f1.part
